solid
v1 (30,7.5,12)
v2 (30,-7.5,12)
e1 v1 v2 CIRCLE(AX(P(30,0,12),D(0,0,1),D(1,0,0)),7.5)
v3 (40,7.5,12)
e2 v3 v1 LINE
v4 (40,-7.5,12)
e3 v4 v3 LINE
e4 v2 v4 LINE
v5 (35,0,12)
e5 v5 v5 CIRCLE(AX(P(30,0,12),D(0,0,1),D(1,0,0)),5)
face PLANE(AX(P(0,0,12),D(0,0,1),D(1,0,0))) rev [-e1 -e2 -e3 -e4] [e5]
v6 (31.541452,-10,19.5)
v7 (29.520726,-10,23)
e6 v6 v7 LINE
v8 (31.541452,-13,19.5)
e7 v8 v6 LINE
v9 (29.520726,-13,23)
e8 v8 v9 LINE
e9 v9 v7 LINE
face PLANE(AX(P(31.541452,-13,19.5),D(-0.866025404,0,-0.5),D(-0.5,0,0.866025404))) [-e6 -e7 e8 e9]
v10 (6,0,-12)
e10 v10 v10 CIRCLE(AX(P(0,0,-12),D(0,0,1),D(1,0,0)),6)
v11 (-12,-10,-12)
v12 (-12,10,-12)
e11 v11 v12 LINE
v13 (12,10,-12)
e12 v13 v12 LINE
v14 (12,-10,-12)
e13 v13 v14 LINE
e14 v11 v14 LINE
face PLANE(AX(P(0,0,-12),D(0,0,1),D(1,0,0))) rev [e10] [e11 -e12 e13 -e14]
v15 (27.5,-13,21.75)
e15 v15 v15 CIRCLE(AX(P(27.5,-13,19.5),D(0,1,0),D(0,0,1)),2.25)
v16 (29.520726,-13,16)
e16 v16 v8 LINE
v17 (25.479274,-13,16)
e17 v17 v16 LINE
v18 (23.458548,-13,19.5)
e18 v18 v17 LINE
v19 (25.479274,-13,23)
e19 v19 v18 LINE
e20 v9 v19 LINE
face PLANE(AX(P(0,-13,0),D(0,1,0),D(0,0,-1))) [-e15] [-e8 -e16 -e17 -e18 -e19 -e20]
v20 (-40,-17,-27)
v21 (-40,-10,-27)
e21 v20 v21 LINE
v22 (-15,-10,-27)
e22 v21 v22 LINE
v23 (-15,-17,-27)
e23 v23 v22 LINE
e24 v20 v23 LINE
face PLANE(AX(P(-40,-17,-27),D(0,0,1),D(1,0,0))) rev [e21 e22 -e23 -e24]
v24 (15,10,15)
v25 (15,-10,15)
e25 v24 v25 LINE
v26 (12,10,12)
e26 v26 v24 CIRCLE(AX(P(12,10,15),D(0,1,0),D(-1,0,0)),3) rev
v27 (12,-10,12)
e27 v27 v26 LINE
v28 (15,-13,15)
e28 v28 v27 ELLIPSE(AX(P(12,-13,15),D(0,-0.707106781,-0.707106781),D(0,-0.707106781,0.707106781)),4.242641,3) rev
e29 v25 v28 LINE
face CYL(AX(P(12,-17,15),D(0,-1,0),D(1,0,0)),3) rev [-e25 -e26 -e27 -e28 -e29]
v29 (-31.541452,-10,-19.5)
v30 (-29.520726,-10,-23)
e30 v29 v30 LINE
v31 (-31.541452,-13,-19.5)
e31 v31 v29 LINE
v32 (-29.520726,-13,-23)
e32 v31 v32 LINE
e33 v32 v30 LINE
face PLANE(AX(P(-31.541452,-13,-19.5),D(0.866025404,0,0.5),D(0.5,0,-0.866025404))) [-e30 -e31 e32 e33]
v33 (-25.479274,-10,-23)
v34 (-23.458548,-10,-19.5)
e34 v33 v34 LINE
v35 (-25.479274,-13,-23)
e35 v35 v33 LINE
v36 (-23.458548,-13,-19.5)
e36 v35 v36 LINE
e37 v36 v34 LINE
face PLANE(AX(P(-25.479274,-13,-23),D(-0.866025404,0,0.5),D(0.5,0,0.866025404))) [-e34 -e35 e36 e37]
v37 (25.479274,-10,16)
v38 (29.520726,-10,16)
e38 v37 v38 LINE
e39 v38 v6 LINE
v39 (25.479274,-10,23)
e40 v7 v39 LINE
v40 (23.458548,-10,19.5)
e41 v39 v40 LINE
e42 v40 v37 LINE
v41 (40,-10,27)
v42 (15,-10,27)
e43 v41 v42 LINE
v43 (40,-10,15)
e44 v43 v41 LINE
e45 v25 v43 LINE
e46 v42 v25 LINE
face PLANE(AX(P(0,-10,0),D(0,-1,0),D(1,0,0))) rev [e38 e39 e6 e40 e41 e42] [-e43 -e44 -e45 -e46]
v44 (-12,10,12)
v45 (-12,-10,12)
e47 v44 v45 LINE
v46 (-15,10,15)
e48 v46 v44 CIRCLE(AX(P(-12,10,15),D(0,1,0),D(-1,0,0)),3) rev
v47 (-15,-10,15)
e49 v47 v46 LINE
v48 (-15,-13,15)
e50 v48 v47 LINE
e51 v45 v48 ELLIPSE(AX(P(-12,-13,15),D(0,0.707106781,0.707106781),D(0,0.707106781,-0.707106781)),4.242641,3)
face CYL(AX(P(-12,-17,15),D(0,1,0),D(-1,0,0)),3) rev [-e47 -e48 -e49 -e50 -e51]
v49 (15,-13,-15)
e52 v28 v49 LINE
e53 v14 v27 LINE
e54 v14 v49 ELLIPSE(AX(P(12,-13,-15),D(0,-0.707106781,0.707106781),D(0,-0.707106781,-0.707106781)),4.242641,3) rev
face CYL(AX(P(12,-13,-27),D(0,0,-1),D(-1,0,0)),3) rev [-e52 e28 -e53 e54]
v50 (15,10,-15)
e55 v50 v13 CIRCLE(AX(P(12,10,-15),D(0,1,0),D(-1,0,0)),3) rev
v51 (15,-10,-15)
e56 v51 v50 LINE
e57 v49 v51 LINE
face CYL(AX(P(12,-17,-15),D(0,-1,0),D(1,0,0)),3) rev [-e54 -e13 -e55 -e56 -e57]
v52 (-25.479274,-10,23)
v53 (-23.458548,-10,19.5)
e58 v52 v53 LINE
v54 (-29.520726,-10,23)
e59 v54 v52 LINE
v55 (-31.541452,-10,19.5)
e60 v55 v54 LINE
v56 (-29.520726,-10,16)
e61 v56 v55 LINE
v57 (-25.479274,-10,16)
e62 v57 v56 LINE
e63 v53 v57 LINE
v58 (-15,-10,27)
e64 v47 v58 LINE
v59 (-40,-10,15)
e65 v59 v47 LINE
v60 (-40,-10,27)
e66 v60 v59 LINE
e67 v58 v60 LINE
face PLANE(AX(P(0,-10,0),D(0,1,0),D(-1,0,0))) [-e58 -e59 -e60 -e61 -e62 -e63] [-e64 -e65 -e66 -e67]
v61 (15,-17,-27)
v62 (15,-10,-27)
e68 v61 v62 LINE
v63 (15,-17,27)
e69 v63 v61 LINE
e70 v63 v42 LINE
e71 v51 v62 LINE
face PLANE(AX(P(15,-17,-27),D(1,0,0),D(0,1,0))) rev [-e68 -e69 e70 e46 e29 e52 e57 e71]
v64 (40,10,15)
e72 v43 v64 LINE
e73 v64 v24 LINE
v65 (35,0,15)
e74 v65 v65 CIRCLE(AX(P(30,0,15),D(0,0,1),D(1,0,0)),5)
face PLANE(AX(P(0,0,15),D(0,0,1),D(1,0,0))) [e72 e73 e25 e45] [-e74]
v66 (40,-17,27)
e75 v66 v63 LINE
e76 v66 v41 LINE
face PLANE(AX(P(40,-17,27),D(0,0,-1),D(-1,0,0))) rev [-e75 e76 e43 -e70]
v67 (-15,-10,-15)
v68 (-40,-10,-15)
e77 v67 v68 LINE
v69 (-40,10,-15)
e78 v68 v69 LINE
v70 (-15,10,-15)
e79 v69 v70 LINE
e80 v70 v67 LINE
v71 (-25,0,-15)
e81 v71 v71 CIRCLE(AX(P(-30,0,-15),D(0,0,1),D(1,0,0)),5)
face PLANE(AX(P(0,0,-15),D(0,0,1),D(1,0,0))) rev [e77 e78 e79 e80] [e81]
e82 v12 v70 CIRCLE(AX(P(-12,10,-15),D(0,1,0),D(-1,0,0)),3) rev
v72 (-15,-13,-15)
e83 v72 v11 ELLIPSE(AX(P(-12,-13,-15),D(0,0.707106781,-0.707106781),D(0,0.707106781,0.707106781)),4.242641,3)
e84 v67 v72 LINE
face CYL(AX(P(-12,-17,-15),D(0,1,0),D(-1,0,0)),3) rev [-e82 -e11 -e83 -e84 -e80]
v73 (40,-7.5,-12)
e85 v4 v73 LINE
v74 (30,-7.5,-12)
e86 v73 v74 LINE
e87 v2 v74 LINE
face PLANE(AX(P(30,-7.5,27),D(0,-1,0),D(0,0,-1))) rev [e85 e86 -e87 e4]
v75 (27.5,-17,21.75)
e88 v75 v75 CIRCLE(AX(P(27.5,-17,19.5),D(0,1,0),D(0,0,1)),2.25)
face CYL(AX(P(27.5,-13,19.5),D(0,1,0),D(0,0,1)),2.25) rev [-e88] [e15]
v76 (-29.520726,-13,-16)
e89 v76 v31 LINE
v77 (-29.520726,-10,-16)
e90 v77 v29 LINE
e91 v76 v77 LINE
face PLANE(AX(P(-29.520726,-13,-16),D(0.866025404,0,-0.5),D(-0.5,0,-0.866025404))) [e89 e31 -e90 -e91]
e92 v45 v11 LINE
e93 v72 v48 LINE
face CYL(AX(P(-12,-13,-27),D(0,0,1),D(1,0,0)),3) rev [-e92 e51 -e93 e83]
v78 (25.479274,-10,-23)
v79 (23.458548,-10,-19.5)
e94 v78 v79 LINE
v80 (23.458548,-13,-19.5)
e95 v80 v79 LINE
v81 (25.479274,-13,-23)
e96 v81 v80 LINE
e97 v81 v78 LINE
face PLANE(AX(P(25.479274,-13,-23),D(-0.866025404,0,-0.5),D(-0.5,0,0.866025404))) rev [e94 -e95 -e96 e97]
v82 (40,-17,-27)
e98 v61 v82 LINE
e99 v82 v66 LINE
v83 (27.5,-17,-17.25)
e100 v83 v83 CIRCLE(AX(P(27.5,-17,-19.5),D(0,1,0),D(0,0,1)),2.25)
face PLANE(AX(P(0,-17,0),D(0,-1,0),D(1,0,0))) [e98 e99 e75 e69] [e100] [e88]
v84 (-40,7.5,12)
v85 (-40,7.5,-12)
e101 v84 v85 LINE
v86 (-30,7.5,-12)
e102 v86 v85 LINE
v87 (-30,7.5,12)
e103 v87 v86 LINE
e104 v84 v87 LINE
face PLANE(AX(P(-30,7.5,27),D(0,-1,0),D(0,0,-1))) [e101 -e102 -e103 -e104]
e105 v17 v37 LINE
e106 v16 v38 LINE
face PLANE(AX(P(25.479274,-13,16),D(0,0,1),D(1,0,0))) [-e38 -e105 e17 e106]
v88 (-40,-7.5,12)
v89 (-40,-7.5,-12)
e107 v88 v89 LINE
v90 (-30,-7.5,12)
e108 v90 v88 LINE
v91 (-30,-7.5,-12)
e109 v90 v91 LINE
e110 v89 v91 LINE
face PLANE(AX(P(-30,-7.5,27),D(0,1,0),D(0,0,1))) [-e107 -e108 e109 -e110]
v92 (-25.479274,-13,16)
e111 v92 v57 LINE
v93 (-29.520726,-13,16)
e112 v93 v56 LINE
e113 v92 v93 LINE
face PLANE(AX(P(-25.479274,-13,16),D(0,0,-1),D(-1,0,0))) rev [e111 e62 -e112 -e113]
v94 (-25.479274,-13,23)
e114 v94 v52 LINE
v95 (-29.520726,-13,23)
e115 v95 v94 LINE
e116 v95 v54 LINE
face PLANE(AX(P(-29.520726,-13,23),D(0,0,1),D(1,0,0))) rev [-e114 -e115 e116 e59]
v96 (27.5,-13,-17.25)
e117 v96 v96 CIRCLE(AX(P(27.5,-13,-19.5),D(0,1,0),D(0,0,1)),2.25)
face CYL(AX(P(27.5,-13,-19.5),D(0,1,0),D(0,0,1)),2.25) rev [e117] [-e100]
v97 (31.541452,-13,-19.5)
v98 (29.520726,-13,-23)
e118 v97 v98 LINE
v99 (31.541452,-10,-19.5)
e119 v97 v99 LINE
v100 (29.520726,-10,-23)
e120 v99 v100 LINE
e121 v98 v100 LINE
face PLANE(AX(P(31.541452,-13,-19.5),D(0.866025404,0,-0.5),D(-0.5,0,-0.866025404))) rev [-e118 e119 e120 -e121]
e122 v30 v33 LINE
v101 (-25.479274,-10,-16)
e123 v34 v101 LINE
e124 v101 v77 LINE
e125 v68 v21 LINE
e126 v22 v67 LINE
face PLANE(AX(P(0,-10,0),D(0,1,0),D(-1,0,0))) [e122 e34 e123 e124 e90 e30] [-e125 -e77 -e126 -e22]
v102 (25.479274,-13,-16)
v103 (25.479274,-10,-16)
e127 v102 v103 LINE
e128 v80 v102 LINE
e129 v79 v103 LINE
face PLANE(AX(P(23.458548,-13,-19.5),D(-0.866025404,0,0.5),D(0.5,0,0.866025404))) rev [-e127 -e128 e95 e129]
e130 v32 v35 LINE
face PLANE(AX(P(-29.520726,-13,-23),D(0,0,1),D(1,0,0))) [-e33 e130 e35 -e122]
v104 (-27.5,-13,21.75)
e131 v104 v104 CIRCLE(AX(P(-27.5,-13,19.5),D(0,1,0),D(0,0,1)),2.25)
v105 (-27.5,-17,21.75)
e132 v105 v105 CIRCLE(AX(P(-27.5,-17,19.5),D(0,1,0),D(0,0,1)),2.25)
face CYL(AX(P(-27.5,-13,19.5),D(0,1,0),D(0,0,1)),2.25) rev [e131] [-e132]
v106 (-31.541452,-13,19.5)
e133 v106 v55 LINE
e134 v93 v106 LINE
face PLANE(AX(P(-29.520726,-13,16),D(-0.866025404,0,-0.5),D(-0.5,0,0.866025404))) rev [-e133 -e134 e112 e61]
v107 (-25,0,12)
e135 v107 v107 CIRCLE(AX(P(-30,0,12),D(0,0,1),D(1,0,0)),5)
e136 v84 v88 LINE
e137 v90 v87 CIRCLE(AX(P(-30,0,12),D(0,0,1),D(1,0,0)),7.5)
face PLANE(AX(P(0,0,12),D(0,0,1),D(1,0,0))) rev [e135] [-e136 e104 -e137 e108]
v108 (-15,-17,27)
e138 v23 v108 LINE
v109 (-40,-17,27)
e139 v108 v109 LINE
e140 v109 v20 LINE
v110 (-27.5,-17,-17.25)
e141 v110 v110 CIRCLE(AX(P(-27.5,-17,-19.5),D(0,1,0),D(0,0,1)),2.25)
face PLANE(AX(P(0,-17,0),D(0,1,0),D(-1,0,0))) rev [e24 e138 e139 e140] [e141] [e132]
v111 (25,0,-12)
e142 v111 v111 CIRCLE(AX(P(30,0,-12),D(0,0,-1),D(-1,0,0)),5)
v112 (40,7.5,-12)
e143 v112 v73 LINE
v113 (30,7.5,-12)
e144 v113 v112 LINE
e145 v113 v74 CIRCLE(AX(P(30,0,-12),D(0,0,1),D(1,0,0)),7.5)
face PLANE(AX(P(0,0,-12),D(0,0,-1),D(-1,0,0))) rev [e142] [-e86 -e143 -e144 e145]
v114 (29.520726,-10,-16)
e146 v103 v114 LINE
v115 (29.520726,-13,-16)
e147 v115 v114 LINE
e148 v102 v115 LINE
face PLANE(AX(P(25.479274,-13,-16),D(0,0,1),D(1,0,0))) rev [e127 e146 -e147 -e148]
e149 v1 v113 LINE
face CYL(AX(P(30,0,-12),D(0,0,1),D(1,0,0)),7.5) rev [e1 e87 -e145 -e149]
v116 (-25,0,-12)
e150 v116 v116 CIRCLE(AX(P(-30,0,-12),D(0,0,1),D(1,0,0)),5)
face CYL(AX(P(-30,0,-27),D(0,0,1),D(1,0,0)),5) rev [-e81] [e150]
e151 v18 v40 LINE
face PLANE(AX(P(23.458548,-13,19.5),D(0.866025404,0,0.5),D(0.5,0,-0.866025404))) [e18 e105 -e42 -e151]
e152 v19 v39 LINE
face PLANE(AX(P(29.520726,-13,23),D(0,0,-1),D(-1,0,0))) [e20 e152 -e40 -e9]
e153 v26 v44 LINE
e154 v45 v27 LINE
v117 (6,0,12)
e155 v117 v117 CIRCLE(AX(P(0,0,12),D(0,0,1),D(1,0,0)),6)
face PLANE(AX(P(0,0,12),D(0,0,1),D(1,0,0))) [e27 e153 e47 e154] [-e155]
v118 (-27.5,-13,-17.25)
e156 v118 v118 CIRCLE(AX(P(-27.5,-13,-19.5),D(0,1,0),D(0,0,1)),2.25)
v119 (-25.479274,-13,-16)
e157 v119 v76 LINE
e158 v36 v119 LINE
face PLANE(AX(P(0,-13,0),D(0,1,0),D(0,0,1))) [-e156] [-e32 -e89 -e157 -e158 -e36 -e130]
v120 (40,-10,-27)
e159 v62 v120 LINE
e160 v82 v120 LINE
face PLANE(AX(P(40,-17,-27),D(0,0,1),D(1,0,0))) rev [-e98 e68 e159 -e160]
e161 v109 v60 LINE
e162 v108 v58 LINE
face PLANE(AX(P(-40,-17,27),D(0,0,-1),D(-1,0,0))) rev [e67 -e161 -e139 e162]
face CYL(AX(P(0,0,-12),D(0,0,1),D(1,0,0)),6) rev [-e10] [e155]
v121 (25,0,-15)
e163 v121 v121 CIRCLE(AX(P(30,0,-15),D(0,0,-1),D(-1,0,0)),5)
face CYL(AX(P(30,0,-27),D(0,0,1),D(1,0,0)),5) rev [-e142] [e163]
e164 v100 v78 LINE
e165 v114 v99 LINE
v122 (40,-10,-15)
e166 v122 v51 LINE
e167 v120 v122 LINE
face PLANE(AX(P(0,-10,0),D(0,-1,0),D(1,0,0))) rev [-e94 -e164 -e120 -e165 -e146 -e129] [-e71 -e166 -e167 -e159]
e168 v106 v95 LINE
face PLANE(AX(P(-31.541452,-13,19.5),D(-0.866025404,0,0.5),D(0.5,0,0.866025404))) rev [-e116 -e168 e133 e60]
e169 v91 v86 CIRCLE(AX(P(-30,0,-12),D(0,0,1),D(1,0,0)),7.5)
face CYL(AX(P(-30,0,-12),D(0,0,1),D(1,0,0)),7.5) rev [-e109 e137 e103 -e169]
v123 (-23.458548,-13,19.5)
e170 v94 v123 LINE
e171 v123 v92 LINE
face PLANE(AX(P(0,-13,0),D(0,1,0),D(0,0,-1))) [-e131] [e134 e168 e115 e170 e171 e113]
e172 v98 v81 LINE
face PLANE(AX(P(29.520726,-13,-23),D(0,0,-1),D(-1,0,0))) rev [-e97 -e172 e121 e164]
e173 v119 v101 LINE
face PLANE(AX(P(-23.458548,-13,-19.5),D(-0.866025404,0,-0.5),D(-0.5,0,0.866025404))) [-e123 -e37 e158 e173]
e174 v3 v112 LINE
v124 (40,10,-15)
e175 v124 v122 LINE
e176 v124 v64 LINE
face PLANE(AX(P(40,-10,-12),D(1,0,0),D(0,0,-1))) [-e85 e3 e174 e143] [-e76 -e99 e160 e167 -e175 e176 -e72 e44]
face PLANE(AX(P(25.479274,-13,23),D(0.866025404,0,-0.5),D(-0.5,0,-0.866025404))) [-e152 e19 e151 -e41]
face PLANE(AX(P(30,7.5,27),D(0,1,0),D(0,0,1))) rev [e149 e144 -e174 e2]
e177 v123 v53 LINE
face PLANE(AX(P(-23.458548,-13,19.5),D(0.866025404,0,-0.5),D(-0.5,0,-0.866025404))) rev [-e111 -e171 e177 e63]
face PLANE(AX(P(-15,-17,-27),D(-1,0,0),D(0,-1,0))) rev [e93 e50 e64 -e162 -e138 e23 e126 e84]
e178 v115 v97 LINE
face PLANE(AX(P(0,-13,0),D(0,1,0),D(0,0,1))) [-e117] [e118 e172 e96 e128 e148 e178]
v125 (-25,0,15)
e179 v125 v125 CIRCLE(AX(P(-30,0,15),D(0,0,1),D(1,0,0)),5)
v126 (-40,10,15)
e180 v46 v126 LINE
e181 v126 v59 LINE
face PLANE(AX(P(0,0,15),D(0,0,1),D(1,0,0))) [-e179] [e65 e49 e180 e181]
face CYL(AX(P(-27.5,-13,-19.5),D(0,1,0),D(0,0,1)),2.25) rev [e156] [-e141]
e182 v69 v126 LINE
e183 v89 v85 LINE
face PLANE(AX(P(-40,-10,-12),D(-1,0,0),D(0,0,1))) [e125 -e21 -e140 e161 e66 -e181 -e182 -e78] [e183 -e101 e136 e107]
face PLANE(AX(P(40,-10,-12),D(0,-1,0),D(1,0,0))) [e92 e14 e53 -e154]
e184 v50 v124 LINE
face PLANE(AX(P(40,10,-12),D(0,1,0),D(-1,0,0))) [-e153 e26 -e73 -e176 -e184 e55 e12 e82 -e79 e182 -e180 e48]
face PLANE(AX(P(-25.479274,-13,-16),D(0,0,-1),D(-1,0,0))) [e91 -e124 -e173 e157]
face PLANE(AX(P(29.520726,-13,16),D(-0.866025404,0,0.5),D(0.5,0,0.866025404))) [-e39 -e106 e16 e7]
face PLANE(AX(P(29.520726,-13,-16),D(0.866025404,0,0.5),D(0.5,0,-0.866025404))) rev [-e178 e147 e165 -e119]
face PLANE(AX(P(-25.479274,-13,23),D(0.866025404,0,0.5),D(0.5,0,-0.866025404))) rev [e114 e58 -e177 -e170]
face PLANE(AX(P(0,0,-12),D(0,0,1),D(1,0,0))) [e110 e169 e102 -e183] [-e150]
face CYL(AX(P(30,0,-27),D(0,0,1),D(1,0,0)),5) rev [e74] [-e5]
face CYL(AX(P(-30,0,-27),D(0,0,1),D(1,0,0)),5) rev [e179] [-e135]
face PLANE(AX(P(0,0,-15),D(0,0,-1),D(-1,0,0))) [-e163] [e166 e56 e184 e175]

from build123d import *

# Parameters (mm, degrees)
BOSS_EXTRUDE1_DEPTH      = 12
BOSS_EXTRUDE1_DEPTH_BACK = 12
SKETCH1_W                = 80
SKETCH1_H                = 20
SKETCH1_R                = 6
SKETCH1_R_2              = 7.5
SKETCH2_W                = 25
SKETCH2_H                = 54
BOSS_EXTRUDE2_DEPTH      = 7
CUT_EXTRUDE1_DEPTH       = 3
MIRROR2_COPY_1_DEPTH     = 3
D_GAGEMENT_M41_D         = 4.5
CUT_EXTRUDE2_DEPTH       = 59.395205283
SKETCH7_W                = 25
SKETCH7_H                = 20
BOSS_EXTRUDE3_DEPTH      = 3
SKETCH8_W                = 25
SKETCH8_H                = 20
BOSS_EXTRUDE4_DEPTH      = 3
CUT_EXTRUDE3_DEPTH       = 59.395205283
CUT_EXTRUDE3_DEPTH_BACK  = 59.395205283
SKETCH10_R               = 5
FILLET1_R                = 3


with BuildPart() as part:
    # Sketch1 → Boss-Extrude1 (new, two sides: drawn at the far end of the back side and taken through both)
    with BuildSketch(Plane.XY.offset(-BOSS_EXTRUDE1_DEPTH_BACK)):
        Rectangle(SKETCH1_W, SKETCH1_H)
        Circle(SKETCH1_R, mode=Mode.SUBTRACT)
        with Locations((30, 0)):
            Circle(SKETCH1_R_2, mode=Mode.SUBTRACT)
        with Locations((-30, 0)):
            Circle(SKETCH1_R_2, mode=Mode.SUBTRACT)
    extrude(amount=BOSS_EXTRUDE1_DEPTH + BOSS_EXTRUDE1_DEPTH_BACK)

    # Sketch2 → Boss-Extrude2 (add)
    with BuildSketch(Plane.XZ.offset(10)):
        with Locations((27.5, 0)):
            Rectangle(SKETCH2_W, SKETCH2_H)
        with Locations((-27.5, 0)):
            Rectangle(SKETCH2_W, SKETCH2_H)
    extrude(amount=BOSS_EXTRUDE2_DEPTH)

    # Sketch3 → Cut-Extrude1 (cut)
    with BuildSketch(Plane(origin=(0, -10, 0), x_dir=(1, 0, 0), z_dir=(0, 1, 0))):
        Polygon((29.520725942, 23.000000033), (25.479274058, 23.000000033), (23.458548116, 19.500000033), (25.479274058, 16.000000033), (29.520725942, 16.000000033), (31.541451884, 19.500000033), align=None)
    cut_extrude1 = extrude(amount=-CUT_EXTRUDE1_DEPTH, mode=Mode.SUBTRACT)

    # Mirror1: Cut-Extrude1 across plane
    add(cut_extrude1.mirror(Plane(origin=(0, 0, 0), x_dir=(0, 0, 1), z_dir=(1, 0, 0))), mode=Mode.SUBTRACT)

    # Mirror2: Cut-Extrude1 across plane
    add(cut_extrude1.mirror(Plane.XY), mode=Mode.SUBTRACT)

    # Mirror2 copy 1 sketch → Mirror2 copy 1 (cut)
    with BuildSketch(Plane(origin=(0, -10, 0), x_dir=(-1, 0, 0), z_dir=(0, 1, 0))):
        Polygon((29.520725942, 23.000000033), (25.479274058, 23.000000033), (23.458548116, 19.500000033), (25.479274058, 16.000000033), (29.520725942, 16.000000033), (31.541451884, 19.500000033), align=None)
    extrude(amount=-MIRROR2_COPY_1_DEPTH, mode=Mode.SUBTRACT)

    # Dégagement M41 (through all)
    with Locations(Plane(origin=(0, -13, 0), x_dir=(1, 0, 0), z_dir=(0, 1, 0))):
        with Locations((27.5, 19.5), (27.5, -19.5), (-27.5, -19.5), (-27.5, 19.5)):
            Hole(D_GAGEMENT_M41_D / 2)

    # Sketch6 → Cut-Extrude2 (cut, through all)
    with BuildSketch(Plane(origin=(0, 0, -12), x_dir=(-1, 0, 0), z_dir=(0, 0, -1))):
        with BuildLine():
            Line((-30, 7.5), (-40, 7.5))
            Line((-40, 7.5), (-40, -7.5))
            Line((-40, -7.5), (-30, -7.5))
            ThreePointArc((-30, -7.5), (-37.5, 0), (-30, 7.5))
        make_face()
    cut_extrude2 = extrude(amount=-CUT_EXTRUDE2_DEPTH, mode=Mode.SUBTRACT)

    # Mirror3: Cut-Extrude2 across plane
    add(cut_extrude2.mirror(Plane(origin=(0, 0, 0), x_dir=(0, 0, 1), z_dir=(1, 0, 0))), mode=Mode.SUBTRACT)

    # Sketch7 → Boss-Extrude3 (add)
    with BuildSketch(Plane(origin=(0, 0, -12), x_dir=(-1, 0, 0), z_dir=(0, 0, -1))):
        with Locations((-27.5, 0)):
            Rectangle(SKETCH7_W, SKETCH7_H)
        with Locations((27.5, 0)):
            Rectangle(SKETCH7_W, SKETCH7_H)
    extrude(amount=BOSS_EXTRUDE3_DEPTH)

    # Sketch8 → Boss-Extrude4 (add)
    with BuildSketch(Plane.XY.offset(12)):
        with Locations((27.5, 0)):
            Rectangle(SKETCH8_W, SKETCH8_H)
        with Locations((-27.5, 0)):
            Rectangle(SKETCH8_W, SKETCH8_H)
    extrude(amount=BOSS_EXTRUDE4_DEPTH)

    # Sketch10 → Cut-Extrude3 (cut, two sides: drawn at the far end of the back side and taken through both)
    with BuildSketch(Plane.XY.offset(-12).offset(-CUT_EXTRUDE3_DEPTH_BACK)):
        with Locations((30, 0)):
            Circle(SKETCH10_R)
        with Locations((-30, 0)):
            Circle(SKETCH10_R)
    extrude(amount=CUT_EXTRUDE3_DEPTH + CUT_EXTRUDE3_DEPTH_BACK, mode=Mode.SUBTRACT)

    # Fillet1
    fillet1_edges = [part.edges().sort_by_distance(p)[0] for p in [
        (15, -10, 0),
        (-15, -10, 0),
        (-15, 0, -12),
        (15, 0, -12),
        (-15, 0, 12),
        (15, 0, 12),
    ]]
    fillet(fillet1_edges, radius=FILLET1_R - 0.0001)  # a hair under: the kernel refuses the full size


solid = part.part
